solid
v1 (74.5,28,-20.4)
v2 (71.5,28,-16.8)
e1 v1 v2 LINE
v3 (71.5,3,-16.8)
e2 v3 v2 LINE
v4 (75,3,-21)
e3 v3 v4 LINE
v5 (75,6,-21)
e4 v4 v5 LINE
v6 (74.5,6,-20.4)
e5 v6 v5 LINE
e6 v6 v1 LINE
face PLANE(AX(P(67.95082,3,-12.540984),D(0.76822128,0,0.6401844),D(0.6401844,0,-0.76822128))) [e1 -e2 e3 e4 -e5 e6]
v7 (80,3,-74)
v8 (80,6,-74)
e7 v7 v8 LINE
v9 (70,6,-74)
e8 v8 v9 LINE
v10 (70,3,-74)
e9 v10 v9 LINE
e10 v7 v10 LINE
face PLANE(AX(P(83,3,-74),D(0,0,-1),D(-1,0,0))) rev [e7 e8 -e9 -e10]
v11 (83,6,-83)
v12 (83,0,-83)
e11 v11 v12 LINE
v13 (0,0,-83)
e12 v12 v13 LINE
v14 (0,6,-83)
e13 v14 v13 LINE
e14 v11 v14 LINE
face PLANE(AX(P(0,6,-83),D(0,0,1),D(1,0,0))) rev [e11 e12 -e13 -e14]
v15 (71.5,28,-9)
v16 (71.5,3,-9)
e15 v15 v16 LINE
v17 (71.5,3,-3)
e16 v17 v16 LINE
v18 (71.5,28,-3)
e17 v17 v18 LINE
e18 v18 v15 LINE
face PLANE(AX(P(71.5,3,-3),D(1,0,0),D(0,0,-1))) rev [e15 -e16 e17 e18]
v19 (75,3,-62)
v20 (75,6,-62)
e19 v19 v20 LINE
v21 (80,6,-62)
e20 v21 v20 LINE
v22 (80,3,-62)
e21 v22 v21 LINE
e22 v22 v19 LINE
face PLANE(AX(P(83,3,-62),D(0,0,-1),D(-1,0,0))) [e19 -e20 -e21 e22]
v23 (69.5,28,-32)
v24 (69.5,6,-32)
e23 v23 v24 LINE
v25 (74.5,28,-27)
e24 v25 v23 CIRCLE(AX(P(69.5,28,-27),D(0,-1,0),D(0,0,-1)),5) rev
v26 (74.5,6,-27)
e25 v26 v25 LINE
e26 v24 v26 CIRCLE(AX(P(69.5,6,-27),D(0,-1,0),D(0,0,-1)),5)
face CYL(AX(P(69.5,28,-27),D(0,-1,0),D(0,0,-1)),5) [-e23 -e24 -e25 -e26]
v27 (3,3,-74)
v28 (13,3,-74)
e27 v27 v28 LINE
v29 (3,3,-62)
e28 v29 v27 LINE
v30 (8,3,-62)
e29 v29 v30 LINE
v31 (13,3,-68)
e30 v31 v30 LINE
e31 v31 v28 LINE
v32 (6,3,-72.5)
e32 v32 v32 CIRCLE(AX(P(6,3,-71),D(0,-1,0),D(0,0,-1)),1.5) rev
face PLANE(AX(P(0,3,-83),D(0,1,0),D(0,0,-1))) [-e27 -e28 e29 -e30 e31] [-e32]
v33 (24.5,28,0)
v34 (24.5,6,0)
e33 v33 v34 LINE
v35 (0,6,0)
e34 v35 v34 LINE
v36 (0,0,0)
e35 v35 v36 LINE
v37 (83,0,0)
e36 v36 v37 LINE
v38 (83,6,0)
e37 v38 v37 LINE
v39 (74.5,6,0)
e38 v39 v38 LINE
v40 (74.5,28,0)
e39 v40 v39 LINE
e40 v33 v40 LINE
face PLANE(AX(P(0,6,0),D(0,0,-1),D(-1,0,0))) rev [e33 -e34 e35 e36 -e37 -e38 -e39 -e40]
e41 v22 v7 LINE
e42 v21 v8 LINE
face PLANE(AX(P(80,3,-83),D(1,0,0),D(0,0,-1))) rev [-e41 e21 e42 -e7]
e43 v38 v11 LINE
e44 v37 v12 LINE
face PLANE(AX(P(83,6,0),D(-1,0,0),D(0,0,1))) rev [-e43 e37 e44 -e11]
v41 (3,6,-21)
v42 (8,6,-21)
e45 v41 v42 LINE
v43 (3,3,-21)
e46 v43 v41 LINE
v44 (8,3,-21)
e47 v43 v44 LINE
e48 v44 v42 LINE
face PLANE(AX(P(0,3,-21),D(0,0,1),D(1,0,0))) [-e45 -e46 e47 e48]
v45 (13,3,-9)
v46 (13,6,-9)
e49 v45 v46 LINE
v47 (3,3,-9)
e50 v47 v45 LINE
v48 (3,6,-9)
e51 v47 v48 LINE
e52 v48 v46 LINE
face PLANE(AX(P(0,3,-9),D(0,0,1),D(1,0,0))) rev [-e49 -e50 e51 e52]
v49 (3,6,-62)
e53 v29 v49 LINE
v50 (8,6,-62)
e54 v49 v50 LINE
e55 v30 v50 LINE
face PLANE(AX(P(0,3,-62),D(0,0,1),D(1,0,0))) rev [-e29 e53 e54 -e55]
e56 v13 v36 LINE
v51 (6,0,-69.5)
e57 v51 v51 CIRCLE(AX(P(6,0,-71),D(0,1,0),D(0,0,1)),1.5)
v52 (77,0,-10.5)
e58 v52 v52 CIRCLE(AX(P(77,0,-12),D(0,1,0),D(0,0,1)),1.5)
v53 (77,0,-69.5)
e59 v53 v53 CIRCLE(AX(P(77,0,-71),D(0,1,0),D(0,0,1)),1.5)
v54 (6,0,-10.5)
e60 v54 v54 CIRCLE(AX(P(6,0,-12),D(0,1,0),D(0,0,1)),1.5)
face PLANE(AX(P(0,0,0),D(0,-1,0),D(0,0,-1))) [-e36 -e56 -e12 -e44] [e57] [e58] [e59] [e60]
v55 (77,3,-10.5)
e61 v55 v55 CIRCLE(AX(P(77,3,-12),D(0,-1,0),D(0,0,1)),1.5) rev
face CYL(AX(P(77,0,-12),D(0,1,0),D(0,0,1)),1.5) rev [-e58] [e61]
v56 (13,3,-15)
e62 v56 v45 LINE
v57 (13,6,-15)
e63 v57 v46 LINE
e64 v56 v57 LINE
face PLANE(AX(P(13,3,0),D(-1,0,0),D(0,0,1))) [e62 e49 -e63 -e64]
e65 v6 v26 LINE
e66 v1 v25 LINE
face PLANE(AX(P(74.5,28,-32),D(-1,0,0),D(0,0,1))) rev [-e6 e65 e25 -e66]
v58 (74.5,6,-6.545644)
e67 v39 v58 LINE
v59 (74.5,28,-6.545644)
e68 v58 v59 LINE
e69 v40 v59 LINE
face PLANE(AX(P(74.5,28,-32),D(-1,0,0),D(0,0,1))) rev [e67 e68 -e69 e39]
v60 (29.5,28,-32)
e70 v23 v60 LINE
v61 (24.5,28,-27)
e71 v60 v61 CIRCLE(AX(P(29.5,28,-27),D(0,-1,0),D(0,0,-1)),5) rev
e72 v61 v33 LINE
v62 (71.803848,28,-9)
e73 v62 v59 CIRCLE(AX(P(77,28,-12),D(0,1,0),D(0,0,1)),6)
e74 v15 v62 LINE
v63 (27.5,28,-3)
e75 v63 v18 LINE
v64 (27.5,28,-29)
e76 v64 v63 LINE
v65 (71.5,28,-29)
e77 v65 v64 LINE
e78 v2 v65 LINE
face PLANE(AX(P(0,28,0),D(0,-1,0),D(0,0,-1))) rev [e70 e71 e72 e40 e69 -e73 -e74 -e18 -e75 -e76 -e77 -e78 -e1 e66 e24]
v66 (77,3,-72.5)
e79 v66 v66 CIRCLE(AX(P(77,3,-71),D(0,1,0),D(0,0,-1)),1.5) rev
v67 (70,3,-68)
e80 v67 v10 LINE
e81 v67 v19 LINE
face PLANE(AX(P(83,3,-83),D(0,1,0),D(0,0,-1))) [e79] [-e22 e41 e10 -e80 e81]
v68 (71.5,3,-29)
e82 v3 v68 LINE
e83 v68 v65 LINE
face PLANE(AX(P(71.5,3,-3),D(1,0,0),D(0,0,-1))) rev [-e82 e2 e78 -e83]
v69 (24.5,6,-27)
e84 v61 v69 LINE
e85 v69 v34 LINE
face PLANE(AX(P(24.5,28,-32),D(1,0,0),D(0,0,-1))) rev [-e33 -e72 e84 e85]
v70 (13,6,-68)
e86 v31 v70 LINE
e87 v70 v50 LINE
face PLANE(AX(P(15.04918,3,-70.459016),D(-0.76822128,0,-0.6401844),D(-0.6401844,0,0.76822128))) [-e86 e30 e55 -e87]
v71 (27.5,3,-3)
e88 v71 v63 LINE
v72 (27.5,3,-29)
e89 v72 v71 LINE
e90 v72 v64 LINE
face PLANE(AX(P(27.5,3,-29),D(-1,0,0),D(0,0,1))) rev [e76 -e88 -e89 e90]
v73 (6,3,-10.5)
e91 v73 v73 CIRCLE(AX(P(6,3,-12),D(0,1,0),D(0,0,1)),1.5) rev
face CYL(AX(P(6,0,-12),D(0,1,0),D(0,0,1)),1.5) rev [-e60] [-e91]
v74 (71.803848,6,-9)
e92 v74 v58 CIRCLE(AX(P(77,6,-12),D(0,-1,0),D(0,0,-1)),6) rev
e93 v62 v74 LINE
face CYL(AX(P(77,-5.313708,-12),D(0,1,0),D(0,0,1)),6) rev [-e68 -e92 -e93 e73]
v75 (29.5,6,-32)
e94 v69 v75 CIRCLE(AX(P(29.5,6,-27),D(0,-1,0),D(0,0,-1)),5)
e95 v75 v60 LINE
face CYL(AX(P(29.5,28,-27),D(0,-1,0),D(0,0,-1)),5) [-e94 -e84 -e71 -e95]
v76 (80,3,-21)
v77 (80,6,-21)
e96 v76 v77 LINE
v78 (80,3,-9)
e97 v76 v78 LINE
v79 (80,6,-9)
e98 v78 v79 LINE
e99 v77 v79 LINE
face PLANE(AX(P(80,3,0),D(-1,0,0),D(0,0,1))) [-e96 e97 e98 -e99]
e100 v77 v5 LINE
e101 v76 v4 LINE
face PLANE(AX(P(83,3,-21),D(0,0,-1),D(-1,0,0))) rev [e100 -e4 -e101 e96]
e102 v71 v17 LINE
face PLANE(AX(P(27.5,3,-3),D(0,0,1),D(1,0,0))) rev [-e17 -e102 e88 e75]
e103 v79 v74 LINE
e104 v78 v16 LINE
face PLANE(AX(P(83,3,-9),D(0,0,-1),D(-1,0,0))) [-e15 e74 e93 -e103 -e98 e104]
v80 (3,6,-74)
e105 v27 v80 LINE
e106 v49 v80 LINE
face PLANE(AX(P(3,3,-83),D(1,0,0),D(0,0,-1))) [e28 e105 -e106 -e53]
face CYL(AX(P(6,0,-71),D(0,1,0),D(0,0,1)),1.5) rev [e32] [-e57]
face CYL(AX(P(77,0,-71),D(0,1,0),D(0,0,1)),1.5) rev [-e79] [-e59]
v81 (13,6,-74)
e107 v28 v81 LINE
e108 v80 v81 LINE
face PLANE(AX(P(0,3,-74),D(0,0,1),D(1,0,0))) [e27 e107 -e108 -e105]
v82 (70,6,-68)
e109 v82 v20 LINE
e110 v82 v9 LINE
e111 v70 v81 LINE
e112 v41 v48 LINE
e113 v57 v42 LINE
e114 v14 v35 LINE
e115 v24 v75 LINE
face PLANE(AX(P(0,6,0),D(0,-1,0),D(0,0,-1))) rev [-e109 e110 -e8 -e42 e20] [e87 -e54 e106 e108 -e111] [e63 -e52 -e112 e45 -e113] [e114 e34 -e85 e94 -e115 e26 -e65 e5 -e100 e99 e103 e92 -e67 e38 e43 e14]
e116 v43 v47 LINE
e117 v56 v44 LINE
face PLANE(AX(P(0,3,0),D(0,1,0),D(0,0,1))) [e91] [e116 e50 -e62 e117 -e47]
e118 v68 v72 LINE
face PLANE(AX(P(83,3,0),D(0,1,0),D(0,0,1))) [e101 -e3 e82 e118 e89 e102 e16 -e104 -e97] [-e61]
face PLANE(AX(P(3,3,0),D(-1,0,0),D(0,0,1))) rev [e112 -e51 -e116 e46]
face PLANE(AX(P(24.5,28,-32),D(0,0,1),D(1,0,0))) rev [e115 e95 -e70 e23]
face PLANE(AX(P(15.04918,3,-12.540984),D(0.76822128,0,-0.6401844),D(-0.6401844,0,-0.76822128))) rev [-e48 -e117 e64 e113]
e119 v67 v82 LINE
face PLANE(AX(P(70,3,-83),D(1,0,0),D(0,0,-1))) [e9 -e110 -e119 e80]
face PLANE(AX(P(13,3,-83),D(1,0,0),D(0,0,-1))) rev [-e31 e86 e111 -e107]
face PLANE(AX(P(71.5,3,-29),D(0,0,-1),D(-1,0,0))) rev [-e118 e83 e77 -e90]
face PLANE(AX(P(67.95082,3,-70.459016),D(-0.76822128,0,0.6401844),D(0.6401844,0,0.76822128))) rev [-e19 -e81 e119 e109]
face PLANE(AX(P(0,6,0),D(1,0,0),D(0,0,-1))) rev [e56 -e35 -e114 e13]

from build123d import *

# Parameters (mm, degrees)
SKETCH1_W                 = 83
SKETCH1_H                 = 83
BOSS_EXTRUDE1_DEPTH       = 6
SKETCH2_R                 = 1.5
CUT_EXTRUDE1_DEPTH        = 118.532974097
SKETCH4_R                 = 1.5
CUT_EXTRUDE4_DEPTH        = 3
BOSS_EXTRUDE2_START       = -3
BOSS_EXTRUDE2_OUTLINE_R   = 1.5
BOSS_EXTRUDE2_DEPTH       = 3
BOSS_EXTRUDE2_2_OUTLINE_W = 50
BOSS_EXTRUDE2_2_OUTLINE_H = 32
BOSS_EXTRUDE2_2_DEPTH     = 22
SKETCH6_W                 = 44
SKETCH6_H                 = 26
CUT_EXTRUDE5_DEPTH        = 25
CUT_EXTRUDE14_DEPTH       = 22
CUT_EXTRUDE15_DEPTH       = 121.012499349
FILLET2_R                 = 5


# Read off the part's stored shape, not the designer's step: Boss-Extrude2
with BuildPart() as part:
    # Sketch1 → Boss-Extrude1 (new body)
    with BuildSketch(Plane(origin=(0, 0, 0), x_dir=(1, 0, 0), z_dir=(0, 1, 0))):
        with Locations((41.5, 41.5)):
            Rectangle(SKETCH1_W, SKETCH1_H)
    extrude(amount=BOSS_EXTRUDE1_DEPTH)

    # Sketch2 → Cut-Extrude1 (cut, through all)
    with BuildSketch(Plane(origin=(0, 6, 0), x_dir=(1, 0, 0), z_dir=(0, 1, 0))):
        with Locations(Location((6, 71, 0), (0, 0, 270))):
            Circle(SKETCH2_R)
        with Locations(Location((6, 12, 0), (0, 0, 270))):
            Circle(SKETCH2_R)
        with Locations(Location((77, 12, 0), (0, 0, 270))):
            Circle(SKETCH2_R)
        with Locations(Location((77, 71, 0), (0, 0, 270))):
            Circle(SKETCH2_R)
    extrude(amount=-CUT_EXTRUDE1_DEPTH, mode=Mode.SUBTRACT)

    # Sketch4 → Cut-Extrude4 (cut)
    with BuildSketch(Plane(origin=(0, 6, 0), x_dir=(1, 0, 0), z_dir=(0, 1, 0))):
        Polygon((13, 15), (13, 9), (3, 9), (3, 21), (8, 21), align=None)
        with Locations(Location((6, 12, 0), (0, 0, 270))):
            Circle(SKETCH4_R, mode=Mode.SUBTRACT)
    cut_extrude4 = extrude(amount=-CUT_EXTRUDE4_DEPTH, mode=Mode.SUBTRACT)

    # Mirror2: Cut-Extrude4 across plane
    add(cut_extrude4.mirror(Plane.XY.offset(-41.5)), mode=Mode.SUBTRACT)

    # Boss-Extrude2 outline → Boss-Extrude2 (cut)
    # profile 1 of 2: a face of its own
    with BuildSketch(Plane(origin=(0, 6, 0), x_dir=(1, 0, 0), z_dir=(0, 1, 0)).offset(BOSS_EXTRUDE2_START)):
        Polygon((75, 21), (70, 15), (70, 9), (80, 9), (80, 21), align=None)
        with Locations((77, 12)):
            Circle(BOSS_EXTRUDE2_OUTLINE_R, mode=Mode.SUBTRACT)
    # profile 2 of 2: a face of its own
    with BuildSketch(Plane(origin=(0, 6, 0), x_dir=(1, 0, 0), z_dir=(0, 1, 0)).offset(BOSS_EXTRUDE2_START)):
        Polygon((75, 62), (80, 62), (80, 74), (70, 74), (70, 68), align=None)
        with Locations((77, 71)):
            Circle(BOSS_EXTRUDE2_OUTLINE_R, mode=Mode.SUBTRACT)
    extrude(amount=BOSS_EXTRUDE2_DEPTH, mode=Mode.SUBTRACT)

    # Boss-Extrude2 2 outline → Boss-Extrude2 2 (add)
    with BuildSketch(Plane(origin=(0, 6, 0), x_dir=(1, 0, 0), z_dir=(0, 1, 0))):
        with Locations((49.5, 16)):
            Rectangle(BOSS_EXTRUDE2_2_OUTLINE_W, BOSS_EXTRUDE2_2_OUTLINE_H)
    extrude(amount=BOSS_EXTRUDE2_2_DEPTH)

    # Sketch6 → Cut-Extrude5 (cut)
    with BuildSketch(Plane(origin=(0, 28, 0), x_dir=(1, 0, 0), z_dir=(0, 1, 0))):
        with Locations((49.5, 16)):
            Rectangle(SKETCH6_W, SKETCH6_H)
    extrude(amount=-CUT_EXTRUDE5_DEPTH, mode=Mode.SUBTRACT)

    # Sketch8 → Cut-Extrude14 (cut)
    with BuildSketch(Plane(origin=(0, 28, 0), x_dir=(1, 0, 0), z_dir=(0, 1, 0))):
        with BuildLine():
            Line((74.5, 9), (74.5, 17.454356057))
            ThreePointArc((74.5, 17.454356057), (72.718007844, 16.202920792), (71.5, 14.397915762))
            Line((71.5, 14.397915762), (71.5, 9.602084238))
            ThreePointArc((71.5, 9.602084238), (71.64345769, 9.296769621), (71.803847577, 9))
            Line((71.803847577, 9), (74.5, 9))
        make_face()
        with BuildLine():
            Line((74.5, 6.545643943), (74.5, 9))
            Line((74.5, 9), (71.803847577, 9))
            ThreePointArc((71.803847577, 9), (72.960983233, 7.563070481), (74.5, 6.545643943))
        make_face()
    extrude(amount=-CUT_EXTRUDE14_DEPTH, mode=Mode.SUBTRACT)

    # Sketch13 → Cut-Extrude15 (cut, through all)
    with BuildSketch(Plane(origin=(0, 3, 0), x_dir=(1, 0, 0), z_dir=(0, 1, 0))):
        Polygon((71.5, 9), (80, 9), (80, 21), (75, 21), (71.5, 16.8), (71.5, 29), (27.5, 29), (27.5, 3), (71.5, 3), align=None)
    extrude(amount=CUT_EXTRUDE15_DEPTH, mode=Mode.SUBTRACT)

    # Fillet2
    fillet2_edges = [part.edges().sort_by_distance(p)[0] for p in [
        (74.5, 17, -32),
        (24.5, 17, -32),
    ]]
    fillet(fillet2_edges, radius=FILLET2_R)


solid = part.part
